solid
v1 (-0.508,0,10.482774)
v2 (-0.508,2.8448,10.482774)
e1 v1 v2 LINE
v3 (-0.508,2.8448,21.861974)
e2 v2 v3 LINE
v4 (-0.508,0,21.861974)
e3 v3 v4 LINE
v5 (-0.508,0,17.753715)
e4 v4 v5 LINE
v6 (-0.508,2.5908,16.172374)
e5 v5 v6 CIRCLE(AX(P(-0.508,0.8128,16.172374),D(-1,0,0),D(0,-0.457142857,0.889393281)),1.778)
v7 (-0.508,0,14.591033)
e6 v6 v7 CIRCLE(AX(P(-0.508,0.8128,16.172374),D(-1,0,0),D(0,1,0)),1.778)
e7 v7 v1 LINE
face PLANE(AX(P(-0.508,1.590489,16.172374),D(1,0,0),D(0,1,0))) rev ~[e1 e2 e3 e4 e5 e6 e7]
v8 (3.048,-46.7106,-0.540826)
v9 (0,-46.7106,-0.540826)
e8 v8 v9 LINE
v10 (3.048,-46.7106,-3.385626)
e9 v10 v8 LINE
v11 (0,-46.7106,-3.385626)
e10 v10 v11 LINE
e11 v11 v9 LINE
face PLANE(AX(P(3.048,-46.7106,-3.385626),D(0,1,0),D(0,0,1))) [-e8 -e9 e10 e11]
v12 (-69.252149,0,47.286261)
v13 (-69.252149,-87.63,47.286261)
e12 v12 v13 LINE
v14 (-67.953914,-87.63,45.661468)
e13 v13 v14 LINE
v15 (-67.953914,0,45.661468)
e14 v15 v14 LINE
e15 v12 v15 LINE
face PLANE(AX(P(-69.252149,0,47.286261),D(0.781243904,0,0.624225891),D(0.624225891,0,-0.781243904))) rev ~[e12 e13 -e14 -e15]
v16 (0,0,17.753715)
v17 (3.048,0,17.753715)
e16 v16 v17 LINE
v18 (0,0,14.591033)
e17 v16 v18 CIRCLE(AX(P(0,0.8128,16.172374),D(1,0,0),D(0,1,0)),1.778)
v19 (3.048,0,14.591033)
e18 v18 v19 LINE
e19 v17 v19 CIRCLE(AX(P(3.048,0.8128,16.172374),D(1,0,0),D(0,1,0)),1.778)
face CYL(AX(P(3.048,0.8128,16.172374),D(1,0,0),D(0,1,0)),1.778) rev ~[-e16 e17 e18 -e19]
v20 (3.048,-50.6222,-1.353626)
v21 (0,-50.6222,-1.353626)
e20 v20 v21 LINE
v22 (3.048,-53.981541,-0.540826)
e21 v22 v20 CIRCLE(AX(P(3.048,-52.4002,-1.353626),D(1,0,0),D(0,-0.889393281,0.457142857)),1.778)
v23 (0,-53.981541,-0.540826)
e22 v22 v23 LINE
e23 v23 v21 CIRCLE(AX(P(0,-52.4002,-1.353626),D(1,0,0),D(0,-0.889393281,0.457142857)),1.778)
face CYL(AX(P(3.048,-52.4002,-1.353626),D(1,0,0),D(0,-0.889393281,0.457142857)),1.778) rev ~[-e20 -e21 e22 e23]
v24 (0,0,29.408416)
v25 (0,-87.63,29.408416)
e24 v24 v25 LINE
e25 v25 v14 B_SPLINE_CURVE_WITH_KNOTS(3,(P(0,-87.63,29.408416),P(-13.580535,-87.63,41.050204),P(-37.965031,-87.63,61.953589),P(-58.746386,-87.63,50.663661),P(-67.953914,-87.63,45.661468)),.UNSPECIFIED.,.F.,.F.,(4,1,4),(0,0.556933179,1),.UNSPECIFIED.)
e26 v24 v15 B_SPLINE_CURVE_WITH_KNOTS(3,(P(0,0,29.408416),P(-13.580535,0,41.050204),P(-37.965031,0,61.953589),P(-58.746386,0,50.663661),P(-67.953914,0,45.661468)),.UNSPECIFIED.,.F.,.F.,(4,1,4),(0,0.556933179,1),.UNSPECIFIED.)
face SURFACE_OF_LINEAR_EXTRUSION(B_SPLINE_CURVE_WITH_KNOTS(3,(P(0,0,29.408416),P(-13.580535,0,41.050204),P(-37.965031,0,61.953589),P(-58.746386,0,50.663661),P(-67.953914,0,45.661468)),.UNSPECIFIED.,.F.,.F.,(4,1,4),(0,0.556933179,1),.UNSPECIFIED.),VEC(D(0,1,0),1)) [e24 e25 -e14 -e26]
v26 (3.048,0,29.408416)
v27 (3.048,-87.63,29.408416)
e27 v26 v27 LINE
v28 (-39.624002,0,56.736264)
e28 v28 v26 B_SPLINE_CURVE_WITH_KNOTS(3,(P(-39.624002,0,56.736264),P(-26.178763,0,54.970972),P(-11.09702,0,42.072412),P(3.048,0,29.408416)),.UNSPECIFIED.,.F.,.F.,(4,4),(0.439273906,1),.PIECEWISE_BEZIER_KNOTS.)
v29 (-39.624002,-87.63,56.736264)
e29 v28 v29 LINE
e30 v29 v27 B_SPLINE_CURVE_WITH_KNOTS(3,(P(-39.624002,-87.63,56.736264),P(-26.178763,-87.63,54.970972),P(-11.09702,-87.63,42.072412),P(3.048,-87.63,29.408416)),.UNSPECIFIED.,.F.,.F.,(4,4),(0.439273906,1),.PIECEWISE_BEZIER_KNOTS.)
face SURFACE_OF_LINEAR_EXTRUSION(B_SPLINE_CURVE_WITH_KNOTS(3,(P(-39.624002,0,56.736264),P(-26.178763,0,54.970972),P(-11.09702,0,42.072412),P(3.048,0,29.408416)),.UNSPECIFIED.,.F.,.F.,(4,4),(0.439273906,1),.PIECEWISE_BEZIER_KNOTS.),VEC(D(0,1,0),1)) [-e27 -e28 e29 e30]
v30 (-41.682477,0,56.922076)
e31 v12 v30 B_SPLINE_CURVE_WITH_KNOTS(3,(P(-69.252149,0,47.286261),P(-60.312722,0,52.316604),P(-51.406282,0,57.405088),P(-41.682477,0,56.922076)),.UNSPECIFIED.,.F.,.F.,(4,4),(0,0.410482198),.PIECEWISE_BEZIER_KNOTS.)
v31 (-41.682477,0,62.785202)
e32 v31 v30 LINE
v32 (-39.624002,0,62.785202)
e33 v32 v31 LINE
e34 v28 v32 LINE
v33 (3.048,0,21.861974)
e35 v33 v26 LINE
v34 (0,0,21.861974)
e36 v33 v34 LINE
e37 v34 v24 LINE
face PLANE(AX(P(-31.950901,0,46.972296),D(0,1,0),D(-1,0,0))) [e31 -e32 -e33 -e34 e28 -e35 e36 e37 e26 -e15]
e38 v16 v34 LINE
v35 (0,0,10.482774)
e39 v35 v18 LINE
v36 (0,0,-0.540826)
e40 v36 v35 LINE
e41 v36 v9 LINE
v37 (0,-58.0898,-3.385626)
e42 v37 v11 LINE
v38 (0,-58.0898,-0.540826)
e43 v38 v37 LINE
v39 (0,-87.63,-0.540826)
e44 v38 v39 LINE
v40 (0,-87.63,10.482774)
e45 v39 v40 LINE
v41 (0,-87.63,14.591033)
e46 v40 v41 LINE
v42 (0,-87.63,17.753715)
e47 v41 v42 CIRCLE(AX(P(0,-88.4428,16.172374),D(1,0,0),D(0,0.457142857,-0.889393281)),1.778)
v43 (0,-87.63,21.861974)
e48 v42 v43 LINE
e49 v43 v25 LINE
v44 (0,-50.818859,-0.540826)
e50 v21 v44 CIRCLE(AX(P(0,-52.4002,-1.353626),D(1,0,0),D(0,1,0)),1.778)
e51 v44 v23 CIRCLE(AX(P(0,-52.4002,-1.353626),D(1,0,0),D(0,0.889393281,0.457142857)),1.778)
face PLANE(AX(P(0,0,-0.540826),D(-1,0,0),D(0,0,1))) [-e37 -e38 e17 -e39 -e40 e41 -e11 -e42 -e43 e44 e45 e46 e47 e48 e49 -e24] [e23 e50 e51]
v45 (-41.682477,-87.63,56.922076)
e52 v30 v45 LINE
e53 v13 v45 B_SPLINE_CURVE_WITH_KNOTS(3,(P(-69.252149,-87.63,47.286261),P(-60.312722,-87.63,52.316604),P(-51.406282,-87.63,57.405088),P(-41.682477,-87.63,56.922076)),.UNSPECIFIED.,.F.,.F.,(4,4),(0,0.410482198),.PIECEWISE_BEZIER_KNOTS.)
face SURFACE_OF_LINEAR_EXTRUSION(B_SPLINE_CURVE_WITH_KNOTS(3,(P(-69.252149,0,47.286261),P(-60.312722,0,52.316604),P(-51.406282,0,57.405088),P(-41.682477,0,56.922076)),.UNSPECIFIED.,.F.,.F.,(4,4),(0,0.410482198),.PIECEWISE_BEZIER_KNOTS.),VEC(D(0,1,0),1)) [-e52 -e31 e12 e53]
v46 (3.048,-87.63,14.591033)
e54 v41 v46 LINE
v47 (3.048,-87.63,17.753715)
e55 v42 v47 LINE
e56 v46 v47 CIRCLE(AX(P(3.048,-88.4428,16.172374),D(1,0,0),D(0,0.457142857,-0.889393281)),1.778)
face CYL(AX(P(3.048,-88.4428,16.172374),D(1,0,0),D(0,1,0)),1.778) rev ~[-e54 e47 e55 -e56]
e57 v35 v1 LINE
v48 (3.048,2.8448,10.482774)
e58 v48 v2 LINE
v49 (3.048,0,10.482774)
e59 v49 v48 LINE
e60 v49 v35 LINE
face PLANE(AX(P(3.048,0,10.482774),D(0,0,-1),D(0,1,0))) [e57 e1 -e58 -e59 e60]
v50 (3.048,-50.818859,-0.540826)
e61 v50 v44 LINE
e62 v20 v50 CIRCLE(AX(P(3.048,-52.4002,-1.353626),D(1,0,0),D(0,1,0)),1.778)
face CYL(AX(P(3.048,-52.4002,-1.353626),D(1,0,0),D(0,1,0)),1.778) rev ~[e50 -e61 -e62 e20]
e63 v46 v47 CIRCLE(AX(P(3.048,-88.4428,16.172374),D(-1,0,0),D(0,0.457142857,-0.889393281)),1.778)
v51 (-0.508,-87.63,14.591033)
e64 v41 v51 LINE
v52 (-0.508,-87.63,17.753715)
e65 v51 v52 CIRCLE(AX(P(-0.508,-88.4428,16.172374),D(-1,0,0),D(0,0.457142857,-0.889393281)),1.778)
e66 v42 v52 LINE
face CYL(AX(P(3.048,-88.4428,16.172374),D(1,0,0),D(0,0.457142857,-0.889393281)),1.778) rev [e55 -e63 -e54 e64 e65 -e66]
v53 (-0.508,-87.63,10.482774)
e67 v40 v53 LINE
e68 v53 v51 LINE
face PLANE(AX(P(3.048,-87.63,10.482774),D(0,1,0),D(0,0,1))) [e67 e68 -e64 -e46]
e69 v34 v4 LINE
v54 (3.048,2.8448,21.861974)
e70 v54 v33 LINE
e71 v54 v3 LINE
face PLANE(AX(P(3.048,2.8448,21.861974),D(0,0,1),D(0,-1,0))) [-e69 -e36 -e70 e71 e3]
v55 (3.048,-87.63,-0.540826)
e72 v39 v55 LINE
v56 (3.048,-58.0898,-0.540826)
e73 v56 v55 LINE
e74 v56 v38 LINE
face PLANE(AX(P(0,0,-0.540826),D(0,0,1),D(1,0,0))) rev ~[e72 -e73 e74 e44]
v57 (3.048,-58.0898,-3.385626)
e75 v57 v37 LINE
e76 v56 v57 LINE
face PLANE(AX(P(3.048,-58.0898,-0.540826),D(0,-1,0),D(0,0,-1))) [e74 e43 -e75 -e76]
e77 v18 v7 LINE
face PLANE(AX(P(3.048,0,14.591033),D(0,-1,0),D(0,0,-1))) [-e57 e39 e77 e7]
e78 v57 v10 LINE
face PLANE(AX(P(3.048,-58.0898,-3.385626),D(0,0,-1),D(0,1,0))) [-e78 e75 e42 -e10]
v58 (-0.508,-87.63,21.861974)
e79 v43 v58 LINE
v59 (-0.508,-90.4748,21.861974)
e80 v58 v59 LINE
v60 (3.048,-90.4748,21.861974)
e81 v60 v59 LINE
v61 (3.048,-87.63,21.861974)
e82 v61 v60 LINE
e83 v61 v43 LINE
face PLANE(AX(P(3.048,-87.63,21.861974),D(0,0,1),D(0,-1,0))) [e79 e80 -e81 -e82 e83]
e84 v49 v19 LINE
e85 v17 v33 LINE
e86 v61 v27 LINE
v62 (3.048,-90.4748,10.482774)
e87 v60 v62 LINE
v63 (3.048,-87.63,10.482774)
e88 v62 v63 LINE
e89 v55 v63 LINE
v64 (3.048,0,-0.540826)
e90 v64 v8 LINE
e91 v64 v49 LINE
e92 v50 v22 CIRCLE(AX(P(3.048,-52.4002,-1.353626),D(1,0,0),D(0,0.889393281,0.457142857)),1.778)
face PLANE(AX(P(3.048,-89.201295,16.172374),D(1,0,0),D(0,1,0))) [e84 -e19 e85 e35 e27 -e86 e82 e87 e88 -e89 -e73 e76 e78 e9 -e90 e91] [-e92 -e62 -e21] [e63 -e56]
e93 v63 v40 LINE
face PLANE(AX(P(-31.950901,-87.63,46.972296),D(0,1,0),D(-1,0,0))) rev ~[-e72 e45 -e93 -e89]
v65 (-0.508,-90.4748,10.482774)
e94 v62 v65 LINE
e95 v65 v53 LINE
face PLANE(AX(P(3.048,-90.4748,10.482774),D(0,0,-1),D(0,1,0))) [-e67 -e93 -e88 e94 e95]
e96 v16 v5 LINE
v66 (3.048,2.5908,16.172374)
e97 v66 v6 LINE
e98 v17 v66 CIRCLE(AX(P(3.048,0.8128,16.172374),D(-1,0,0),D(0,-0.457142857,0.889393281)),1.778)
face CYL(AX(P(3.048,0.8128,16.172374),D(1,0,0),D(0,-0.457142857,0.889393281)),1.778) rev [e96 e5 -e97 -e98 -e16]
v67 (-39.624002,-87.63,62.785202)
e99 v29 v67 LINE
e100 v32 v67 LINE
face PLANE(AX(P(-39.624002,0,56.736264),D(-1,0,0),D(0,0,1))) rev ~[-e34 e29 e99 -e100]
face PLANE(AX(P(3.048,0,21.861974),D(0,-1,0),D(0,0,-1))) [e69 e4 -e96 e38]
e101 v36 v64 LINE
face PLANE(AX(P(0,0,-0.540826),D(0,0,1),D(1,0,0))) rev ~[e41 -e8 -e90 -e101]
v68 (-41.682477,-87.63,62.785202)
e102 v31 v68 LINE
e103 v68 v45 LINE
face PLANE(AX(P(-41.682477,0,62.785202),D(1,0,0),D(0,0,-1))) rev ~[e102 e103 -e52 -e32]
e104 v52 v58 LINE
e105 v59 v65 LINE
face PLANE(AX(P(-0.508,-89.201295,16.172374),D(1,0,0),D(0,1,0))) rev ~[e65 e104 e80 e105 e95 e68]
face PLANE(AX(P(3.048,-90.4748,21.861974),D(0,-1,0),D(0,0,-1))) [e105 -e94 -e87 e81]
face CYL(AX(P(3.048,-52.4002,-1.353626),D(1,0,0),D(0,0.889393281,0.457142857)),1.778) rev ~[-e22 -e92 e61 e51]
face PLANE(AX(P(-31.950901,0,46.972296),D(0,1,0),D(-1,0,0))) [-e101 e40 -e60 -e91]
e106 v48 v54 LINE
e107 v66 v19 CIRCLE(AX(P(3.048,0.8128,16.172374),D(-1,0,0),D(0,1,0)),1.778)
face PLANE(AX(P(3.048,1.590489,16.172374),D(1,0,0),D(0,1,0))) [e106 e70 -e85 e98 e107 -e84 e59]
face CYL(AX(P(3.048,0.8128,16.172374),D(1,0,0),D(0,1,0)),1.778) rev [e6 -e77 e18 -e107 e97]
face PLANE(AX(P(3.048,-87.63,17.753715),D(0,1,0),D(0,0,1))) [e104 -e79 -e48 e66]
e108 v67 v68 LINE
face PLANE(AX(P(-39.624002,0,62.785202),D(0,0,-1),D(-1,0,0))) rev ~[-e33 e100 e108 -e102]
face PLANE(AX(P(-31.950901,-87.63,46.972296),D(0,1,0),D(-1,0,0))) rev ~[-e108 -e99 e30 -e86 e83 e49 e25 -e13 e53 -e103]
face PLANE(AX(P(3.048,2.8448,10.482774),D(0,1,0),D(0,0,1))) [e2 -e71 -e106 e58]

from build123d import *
from build123d import SkipClean  # not in build123d's __all__

# Parameters (mm, degrees)
F0_W     = 3.048
F0_H     = 29.9492416
F1_DEPTH = 87.63
F2_R     = 1.778
F3_DEPTH = 3.048
F4_DEPTH = 25.4
F5_DEPTH = 25.4
F6_DEPTH = 3.556
F7_DEPTH = 3.556


with BuildPart() as f1:
    # F0 (on Front) → F1 (new body)
    with BuildSketch(Plane.XZ):
        with BuildLine():
            add(Edge.make_bspline(
                [(-69.252148823, 47.2862608473), (-60.3127224637, 52.3166042602), (-51.4062820573, 57.4050875064), (-41.6824767012, 56.9220757762)],
                knots=[0, 0, 0, 0, 0.4104821983, 0.4104821983, 0.4104821983, 0.4104821983], degree=3))
            Line((-69.252148823, 47.2862608473), (-67.9539144039, 45.6614680588))
            add(Edge.make_bspline(
                [(0, 29.4084157124), (-13.5805348603, 41.0502040776), (-37.9650308205, 61.9535885379), (-58.746385608, 50.6636605559), (-67.9539144039, 45.6614680588)],
                knots=[0, 0, 0, 0, 0.5569331793, 1, 1, 1, 1], degree=3))
            Line((0, 29.4084157124), (3.048, 29.4084157124))
            add(Edge.make_bspline(
                [(-39.6240018308, 56.7362643778), (-26.1787631346, 54.9709717695), (-11.0970199105, 42.072411724), (3.048, 29.4084157124)],
                knots=[0.4392739055, 0.4392739055, 0.4392739055, 0.4392739055, 1, 1, 1, 1], degree=3))
            add(Edge.make_bspline(
                [(-41.6824767012, 56.9220757762), (-41.0004374843, 56.8881967617), (-40.3143770071, 56.8269071863), (-39.6240018308, 56.7362643778)],
                knots=[0.4104821983, 0.4104821983, 0.4104821983, 0.4104821983, 0.4392739055, 0.4392739055, 0.4392739055, 0.4392739055], degree=3))
        make_face()
        with BuildLine():
            Line((-41.6824767012, 62.7852019621), (-41.6824767012, 56.9220757762))
            add(Edge.make_bspline(
                [(-41.6824767012, 56.9220757762), (-41.0004374843, 56.8881967617), (-40.3143770071, 56.8269071863), (-39.6240018308, 56.7362643778)],
                knots=[0.4104821983, 0.4104821983, 0.4104821983, 0.4104821983, 0.4392739055, 0.4392739055, 0.4392739055, 0.4392739055], degree=3))
            Line((-39.6240018308, 56.7362643778), (-39.6240018308, 62.7852019621))
            Line((-39.6240018308, 62.7852019621), (-41.6824767012, 62.7852019621))
        make_face()
        with Locations((1.524, 14.4337949124)):
            Rectangle(F0_W, F0_H)
    extrude(amount=F1_DEPTH)

    # F2 (on face) → F3 (join)
    with BuildSketch(Plane.YZ.offset(3.048)):
        with Locations((-52.4002, -1.3536258876)):
            Circle(F2_R)
        with Locations((-88.4428, 16.1723741124)):
            Circle(F2_R)
        with Locations((0.8128, 16.1723741124)):
            Circle(F2_R)
        with BuildLine():
            Line((-53.9815412535, -0.5408258876), (-58.0898, -0.5408258876))
            Line((-58.0898, -0.5408258876), (-58.0898, -3.3856258876))
            Line((-58.0898, -3.3856258876), (-46.7106, -3.3856258876))
            Line((-46.7106, -3.3856258876), (-46.7106, -0.5408258876))
            Line((-46.7106, -0.5408258876), (-50.8188587465, -0.5408258876))
            ThreePointArc((-50.8188587465, -0.5408258876), (-50.6720639017, -0.9354995602), (-50.6222, -1.3536258876))
            ThreePointArc((-50.6222, -1.3536258876), (-52.8183263274, -3.0817619859), (-53.9815412535, -0.5408258876))
        make_face()
    extrude(amount=-F3_DEPTH)

    # F2 (on face) → F4 (cut)
    with BuildSketch(Plane.YZ.offset(3.048)):
        with BuildLine():
            ThreePointArc((-50.8188587465, -0.5408258876), (-52.4002, 0.4243741124), (-53.9815412535, -0.5408258876))
            Line((-53.9815412535, -0.5408258876), (-50.8188587465, -0.5408258876))
        make_face()
        with BuildLine():
            Line((-50.8188587465, -0.5408258876), (-53.9815412535, -0.5408258876))
            ThreePointArc((-53.9815412535, -0.5408258876), (-52.8183263274, -3.0817619859), (-50.6222, -1.3536258876))
            ThreePointArc((-50.6222, -1.3536258876), (-50.6720639017, -0.9354995602), (-50.8188587465, -0.5408258876))
        make_face()
    extrude(amount=-F4_DEPTH, mode=Mode.SUBTRACT)

    # F2 (on face) → F5 (cut)
    with BuildSketch(Plane.YZ.offset(3.048)):
        with Locations((-52.4002, -1.3536258876)):
            Circle(F2_R)
        with Locations((-88.4428, 16.1723741124)):
            Circle(F2_R)
        with Locations((0.8128, 16.1723741124)):
            Circle(F2_R)
        with BuildLine():
            Line((-87.63, 17.7537153659), (-87.63, 14.5910328589))
            ThreePointArc((-87.63, 14.5910328589), (-86.9251632846, 15.24605732), (-86.6648, 16.1723741124))
            ThreePointArc((-86.6648, 16.1723741124), (-86.9251632846, 17.0986909049), (-87.63, 17.7537153659))
        make_face()
    extrude(amount=-F5_DEPTH, mode=Mode.SUBTRACT)

    # F2 (on face) → F6 (join)
    with BuildSketch(Plane.YZ.offset(3.048)):
        with BuildLine():
            Line((-90.4748, 10.4827741124), (-87.63, 10.4827741124))
            Line((-87.63, 10.4827741124), (-87.63, 14.5910328589))
            ThreePointArc((-87.63, 14.5910328589), (-90.2208, 16.1723741124), (-87.63, 17.7537153659))
            Line((-87.63, 17.7537153659), (-87.63, 21.8619741124))
            Line((-87.63, 21.8619741124), (-90.4748, 21.8619741124))
            Line((-90.4748, 21.8619741124), (-90.4748, 10.4827741124))
        make_face()
    extrude(amount=-F6_DEPTH)

    # F2 (on face) → F7 (join)
    with BuildSketch(Plane.YZ.offset(3.048)):
        with BuildLine():
            Line((0, 14.5910328589), (0, 10.4827741124))
            Line((0, 10.4827741124), (2.8448, 10.4827741124))
            Line((2.8448, 10.4827741124), (2.8448, 21.8619741124))
            Line((2.8448, 21.8619741124), (0, 21.8619741124))
            Line((0, 21.8619741124), (0, 17.7537153659))
            ThreePointArc((0, 17.7537153659), (1.7391167925, 17.6900108278), (2.5908, 16.1723741124))
            ThreePointArc((2.5908, 16.1723741124), (1.7391167925, 14.654737397), (0, 14.5910328589))
        make_face()
    with SkipClean():  # cleaning this boolean's faces spoils the solid; the shape is the same uncleaned
        extrude(amount=-F7_DEPTH)


solid = f1.part
